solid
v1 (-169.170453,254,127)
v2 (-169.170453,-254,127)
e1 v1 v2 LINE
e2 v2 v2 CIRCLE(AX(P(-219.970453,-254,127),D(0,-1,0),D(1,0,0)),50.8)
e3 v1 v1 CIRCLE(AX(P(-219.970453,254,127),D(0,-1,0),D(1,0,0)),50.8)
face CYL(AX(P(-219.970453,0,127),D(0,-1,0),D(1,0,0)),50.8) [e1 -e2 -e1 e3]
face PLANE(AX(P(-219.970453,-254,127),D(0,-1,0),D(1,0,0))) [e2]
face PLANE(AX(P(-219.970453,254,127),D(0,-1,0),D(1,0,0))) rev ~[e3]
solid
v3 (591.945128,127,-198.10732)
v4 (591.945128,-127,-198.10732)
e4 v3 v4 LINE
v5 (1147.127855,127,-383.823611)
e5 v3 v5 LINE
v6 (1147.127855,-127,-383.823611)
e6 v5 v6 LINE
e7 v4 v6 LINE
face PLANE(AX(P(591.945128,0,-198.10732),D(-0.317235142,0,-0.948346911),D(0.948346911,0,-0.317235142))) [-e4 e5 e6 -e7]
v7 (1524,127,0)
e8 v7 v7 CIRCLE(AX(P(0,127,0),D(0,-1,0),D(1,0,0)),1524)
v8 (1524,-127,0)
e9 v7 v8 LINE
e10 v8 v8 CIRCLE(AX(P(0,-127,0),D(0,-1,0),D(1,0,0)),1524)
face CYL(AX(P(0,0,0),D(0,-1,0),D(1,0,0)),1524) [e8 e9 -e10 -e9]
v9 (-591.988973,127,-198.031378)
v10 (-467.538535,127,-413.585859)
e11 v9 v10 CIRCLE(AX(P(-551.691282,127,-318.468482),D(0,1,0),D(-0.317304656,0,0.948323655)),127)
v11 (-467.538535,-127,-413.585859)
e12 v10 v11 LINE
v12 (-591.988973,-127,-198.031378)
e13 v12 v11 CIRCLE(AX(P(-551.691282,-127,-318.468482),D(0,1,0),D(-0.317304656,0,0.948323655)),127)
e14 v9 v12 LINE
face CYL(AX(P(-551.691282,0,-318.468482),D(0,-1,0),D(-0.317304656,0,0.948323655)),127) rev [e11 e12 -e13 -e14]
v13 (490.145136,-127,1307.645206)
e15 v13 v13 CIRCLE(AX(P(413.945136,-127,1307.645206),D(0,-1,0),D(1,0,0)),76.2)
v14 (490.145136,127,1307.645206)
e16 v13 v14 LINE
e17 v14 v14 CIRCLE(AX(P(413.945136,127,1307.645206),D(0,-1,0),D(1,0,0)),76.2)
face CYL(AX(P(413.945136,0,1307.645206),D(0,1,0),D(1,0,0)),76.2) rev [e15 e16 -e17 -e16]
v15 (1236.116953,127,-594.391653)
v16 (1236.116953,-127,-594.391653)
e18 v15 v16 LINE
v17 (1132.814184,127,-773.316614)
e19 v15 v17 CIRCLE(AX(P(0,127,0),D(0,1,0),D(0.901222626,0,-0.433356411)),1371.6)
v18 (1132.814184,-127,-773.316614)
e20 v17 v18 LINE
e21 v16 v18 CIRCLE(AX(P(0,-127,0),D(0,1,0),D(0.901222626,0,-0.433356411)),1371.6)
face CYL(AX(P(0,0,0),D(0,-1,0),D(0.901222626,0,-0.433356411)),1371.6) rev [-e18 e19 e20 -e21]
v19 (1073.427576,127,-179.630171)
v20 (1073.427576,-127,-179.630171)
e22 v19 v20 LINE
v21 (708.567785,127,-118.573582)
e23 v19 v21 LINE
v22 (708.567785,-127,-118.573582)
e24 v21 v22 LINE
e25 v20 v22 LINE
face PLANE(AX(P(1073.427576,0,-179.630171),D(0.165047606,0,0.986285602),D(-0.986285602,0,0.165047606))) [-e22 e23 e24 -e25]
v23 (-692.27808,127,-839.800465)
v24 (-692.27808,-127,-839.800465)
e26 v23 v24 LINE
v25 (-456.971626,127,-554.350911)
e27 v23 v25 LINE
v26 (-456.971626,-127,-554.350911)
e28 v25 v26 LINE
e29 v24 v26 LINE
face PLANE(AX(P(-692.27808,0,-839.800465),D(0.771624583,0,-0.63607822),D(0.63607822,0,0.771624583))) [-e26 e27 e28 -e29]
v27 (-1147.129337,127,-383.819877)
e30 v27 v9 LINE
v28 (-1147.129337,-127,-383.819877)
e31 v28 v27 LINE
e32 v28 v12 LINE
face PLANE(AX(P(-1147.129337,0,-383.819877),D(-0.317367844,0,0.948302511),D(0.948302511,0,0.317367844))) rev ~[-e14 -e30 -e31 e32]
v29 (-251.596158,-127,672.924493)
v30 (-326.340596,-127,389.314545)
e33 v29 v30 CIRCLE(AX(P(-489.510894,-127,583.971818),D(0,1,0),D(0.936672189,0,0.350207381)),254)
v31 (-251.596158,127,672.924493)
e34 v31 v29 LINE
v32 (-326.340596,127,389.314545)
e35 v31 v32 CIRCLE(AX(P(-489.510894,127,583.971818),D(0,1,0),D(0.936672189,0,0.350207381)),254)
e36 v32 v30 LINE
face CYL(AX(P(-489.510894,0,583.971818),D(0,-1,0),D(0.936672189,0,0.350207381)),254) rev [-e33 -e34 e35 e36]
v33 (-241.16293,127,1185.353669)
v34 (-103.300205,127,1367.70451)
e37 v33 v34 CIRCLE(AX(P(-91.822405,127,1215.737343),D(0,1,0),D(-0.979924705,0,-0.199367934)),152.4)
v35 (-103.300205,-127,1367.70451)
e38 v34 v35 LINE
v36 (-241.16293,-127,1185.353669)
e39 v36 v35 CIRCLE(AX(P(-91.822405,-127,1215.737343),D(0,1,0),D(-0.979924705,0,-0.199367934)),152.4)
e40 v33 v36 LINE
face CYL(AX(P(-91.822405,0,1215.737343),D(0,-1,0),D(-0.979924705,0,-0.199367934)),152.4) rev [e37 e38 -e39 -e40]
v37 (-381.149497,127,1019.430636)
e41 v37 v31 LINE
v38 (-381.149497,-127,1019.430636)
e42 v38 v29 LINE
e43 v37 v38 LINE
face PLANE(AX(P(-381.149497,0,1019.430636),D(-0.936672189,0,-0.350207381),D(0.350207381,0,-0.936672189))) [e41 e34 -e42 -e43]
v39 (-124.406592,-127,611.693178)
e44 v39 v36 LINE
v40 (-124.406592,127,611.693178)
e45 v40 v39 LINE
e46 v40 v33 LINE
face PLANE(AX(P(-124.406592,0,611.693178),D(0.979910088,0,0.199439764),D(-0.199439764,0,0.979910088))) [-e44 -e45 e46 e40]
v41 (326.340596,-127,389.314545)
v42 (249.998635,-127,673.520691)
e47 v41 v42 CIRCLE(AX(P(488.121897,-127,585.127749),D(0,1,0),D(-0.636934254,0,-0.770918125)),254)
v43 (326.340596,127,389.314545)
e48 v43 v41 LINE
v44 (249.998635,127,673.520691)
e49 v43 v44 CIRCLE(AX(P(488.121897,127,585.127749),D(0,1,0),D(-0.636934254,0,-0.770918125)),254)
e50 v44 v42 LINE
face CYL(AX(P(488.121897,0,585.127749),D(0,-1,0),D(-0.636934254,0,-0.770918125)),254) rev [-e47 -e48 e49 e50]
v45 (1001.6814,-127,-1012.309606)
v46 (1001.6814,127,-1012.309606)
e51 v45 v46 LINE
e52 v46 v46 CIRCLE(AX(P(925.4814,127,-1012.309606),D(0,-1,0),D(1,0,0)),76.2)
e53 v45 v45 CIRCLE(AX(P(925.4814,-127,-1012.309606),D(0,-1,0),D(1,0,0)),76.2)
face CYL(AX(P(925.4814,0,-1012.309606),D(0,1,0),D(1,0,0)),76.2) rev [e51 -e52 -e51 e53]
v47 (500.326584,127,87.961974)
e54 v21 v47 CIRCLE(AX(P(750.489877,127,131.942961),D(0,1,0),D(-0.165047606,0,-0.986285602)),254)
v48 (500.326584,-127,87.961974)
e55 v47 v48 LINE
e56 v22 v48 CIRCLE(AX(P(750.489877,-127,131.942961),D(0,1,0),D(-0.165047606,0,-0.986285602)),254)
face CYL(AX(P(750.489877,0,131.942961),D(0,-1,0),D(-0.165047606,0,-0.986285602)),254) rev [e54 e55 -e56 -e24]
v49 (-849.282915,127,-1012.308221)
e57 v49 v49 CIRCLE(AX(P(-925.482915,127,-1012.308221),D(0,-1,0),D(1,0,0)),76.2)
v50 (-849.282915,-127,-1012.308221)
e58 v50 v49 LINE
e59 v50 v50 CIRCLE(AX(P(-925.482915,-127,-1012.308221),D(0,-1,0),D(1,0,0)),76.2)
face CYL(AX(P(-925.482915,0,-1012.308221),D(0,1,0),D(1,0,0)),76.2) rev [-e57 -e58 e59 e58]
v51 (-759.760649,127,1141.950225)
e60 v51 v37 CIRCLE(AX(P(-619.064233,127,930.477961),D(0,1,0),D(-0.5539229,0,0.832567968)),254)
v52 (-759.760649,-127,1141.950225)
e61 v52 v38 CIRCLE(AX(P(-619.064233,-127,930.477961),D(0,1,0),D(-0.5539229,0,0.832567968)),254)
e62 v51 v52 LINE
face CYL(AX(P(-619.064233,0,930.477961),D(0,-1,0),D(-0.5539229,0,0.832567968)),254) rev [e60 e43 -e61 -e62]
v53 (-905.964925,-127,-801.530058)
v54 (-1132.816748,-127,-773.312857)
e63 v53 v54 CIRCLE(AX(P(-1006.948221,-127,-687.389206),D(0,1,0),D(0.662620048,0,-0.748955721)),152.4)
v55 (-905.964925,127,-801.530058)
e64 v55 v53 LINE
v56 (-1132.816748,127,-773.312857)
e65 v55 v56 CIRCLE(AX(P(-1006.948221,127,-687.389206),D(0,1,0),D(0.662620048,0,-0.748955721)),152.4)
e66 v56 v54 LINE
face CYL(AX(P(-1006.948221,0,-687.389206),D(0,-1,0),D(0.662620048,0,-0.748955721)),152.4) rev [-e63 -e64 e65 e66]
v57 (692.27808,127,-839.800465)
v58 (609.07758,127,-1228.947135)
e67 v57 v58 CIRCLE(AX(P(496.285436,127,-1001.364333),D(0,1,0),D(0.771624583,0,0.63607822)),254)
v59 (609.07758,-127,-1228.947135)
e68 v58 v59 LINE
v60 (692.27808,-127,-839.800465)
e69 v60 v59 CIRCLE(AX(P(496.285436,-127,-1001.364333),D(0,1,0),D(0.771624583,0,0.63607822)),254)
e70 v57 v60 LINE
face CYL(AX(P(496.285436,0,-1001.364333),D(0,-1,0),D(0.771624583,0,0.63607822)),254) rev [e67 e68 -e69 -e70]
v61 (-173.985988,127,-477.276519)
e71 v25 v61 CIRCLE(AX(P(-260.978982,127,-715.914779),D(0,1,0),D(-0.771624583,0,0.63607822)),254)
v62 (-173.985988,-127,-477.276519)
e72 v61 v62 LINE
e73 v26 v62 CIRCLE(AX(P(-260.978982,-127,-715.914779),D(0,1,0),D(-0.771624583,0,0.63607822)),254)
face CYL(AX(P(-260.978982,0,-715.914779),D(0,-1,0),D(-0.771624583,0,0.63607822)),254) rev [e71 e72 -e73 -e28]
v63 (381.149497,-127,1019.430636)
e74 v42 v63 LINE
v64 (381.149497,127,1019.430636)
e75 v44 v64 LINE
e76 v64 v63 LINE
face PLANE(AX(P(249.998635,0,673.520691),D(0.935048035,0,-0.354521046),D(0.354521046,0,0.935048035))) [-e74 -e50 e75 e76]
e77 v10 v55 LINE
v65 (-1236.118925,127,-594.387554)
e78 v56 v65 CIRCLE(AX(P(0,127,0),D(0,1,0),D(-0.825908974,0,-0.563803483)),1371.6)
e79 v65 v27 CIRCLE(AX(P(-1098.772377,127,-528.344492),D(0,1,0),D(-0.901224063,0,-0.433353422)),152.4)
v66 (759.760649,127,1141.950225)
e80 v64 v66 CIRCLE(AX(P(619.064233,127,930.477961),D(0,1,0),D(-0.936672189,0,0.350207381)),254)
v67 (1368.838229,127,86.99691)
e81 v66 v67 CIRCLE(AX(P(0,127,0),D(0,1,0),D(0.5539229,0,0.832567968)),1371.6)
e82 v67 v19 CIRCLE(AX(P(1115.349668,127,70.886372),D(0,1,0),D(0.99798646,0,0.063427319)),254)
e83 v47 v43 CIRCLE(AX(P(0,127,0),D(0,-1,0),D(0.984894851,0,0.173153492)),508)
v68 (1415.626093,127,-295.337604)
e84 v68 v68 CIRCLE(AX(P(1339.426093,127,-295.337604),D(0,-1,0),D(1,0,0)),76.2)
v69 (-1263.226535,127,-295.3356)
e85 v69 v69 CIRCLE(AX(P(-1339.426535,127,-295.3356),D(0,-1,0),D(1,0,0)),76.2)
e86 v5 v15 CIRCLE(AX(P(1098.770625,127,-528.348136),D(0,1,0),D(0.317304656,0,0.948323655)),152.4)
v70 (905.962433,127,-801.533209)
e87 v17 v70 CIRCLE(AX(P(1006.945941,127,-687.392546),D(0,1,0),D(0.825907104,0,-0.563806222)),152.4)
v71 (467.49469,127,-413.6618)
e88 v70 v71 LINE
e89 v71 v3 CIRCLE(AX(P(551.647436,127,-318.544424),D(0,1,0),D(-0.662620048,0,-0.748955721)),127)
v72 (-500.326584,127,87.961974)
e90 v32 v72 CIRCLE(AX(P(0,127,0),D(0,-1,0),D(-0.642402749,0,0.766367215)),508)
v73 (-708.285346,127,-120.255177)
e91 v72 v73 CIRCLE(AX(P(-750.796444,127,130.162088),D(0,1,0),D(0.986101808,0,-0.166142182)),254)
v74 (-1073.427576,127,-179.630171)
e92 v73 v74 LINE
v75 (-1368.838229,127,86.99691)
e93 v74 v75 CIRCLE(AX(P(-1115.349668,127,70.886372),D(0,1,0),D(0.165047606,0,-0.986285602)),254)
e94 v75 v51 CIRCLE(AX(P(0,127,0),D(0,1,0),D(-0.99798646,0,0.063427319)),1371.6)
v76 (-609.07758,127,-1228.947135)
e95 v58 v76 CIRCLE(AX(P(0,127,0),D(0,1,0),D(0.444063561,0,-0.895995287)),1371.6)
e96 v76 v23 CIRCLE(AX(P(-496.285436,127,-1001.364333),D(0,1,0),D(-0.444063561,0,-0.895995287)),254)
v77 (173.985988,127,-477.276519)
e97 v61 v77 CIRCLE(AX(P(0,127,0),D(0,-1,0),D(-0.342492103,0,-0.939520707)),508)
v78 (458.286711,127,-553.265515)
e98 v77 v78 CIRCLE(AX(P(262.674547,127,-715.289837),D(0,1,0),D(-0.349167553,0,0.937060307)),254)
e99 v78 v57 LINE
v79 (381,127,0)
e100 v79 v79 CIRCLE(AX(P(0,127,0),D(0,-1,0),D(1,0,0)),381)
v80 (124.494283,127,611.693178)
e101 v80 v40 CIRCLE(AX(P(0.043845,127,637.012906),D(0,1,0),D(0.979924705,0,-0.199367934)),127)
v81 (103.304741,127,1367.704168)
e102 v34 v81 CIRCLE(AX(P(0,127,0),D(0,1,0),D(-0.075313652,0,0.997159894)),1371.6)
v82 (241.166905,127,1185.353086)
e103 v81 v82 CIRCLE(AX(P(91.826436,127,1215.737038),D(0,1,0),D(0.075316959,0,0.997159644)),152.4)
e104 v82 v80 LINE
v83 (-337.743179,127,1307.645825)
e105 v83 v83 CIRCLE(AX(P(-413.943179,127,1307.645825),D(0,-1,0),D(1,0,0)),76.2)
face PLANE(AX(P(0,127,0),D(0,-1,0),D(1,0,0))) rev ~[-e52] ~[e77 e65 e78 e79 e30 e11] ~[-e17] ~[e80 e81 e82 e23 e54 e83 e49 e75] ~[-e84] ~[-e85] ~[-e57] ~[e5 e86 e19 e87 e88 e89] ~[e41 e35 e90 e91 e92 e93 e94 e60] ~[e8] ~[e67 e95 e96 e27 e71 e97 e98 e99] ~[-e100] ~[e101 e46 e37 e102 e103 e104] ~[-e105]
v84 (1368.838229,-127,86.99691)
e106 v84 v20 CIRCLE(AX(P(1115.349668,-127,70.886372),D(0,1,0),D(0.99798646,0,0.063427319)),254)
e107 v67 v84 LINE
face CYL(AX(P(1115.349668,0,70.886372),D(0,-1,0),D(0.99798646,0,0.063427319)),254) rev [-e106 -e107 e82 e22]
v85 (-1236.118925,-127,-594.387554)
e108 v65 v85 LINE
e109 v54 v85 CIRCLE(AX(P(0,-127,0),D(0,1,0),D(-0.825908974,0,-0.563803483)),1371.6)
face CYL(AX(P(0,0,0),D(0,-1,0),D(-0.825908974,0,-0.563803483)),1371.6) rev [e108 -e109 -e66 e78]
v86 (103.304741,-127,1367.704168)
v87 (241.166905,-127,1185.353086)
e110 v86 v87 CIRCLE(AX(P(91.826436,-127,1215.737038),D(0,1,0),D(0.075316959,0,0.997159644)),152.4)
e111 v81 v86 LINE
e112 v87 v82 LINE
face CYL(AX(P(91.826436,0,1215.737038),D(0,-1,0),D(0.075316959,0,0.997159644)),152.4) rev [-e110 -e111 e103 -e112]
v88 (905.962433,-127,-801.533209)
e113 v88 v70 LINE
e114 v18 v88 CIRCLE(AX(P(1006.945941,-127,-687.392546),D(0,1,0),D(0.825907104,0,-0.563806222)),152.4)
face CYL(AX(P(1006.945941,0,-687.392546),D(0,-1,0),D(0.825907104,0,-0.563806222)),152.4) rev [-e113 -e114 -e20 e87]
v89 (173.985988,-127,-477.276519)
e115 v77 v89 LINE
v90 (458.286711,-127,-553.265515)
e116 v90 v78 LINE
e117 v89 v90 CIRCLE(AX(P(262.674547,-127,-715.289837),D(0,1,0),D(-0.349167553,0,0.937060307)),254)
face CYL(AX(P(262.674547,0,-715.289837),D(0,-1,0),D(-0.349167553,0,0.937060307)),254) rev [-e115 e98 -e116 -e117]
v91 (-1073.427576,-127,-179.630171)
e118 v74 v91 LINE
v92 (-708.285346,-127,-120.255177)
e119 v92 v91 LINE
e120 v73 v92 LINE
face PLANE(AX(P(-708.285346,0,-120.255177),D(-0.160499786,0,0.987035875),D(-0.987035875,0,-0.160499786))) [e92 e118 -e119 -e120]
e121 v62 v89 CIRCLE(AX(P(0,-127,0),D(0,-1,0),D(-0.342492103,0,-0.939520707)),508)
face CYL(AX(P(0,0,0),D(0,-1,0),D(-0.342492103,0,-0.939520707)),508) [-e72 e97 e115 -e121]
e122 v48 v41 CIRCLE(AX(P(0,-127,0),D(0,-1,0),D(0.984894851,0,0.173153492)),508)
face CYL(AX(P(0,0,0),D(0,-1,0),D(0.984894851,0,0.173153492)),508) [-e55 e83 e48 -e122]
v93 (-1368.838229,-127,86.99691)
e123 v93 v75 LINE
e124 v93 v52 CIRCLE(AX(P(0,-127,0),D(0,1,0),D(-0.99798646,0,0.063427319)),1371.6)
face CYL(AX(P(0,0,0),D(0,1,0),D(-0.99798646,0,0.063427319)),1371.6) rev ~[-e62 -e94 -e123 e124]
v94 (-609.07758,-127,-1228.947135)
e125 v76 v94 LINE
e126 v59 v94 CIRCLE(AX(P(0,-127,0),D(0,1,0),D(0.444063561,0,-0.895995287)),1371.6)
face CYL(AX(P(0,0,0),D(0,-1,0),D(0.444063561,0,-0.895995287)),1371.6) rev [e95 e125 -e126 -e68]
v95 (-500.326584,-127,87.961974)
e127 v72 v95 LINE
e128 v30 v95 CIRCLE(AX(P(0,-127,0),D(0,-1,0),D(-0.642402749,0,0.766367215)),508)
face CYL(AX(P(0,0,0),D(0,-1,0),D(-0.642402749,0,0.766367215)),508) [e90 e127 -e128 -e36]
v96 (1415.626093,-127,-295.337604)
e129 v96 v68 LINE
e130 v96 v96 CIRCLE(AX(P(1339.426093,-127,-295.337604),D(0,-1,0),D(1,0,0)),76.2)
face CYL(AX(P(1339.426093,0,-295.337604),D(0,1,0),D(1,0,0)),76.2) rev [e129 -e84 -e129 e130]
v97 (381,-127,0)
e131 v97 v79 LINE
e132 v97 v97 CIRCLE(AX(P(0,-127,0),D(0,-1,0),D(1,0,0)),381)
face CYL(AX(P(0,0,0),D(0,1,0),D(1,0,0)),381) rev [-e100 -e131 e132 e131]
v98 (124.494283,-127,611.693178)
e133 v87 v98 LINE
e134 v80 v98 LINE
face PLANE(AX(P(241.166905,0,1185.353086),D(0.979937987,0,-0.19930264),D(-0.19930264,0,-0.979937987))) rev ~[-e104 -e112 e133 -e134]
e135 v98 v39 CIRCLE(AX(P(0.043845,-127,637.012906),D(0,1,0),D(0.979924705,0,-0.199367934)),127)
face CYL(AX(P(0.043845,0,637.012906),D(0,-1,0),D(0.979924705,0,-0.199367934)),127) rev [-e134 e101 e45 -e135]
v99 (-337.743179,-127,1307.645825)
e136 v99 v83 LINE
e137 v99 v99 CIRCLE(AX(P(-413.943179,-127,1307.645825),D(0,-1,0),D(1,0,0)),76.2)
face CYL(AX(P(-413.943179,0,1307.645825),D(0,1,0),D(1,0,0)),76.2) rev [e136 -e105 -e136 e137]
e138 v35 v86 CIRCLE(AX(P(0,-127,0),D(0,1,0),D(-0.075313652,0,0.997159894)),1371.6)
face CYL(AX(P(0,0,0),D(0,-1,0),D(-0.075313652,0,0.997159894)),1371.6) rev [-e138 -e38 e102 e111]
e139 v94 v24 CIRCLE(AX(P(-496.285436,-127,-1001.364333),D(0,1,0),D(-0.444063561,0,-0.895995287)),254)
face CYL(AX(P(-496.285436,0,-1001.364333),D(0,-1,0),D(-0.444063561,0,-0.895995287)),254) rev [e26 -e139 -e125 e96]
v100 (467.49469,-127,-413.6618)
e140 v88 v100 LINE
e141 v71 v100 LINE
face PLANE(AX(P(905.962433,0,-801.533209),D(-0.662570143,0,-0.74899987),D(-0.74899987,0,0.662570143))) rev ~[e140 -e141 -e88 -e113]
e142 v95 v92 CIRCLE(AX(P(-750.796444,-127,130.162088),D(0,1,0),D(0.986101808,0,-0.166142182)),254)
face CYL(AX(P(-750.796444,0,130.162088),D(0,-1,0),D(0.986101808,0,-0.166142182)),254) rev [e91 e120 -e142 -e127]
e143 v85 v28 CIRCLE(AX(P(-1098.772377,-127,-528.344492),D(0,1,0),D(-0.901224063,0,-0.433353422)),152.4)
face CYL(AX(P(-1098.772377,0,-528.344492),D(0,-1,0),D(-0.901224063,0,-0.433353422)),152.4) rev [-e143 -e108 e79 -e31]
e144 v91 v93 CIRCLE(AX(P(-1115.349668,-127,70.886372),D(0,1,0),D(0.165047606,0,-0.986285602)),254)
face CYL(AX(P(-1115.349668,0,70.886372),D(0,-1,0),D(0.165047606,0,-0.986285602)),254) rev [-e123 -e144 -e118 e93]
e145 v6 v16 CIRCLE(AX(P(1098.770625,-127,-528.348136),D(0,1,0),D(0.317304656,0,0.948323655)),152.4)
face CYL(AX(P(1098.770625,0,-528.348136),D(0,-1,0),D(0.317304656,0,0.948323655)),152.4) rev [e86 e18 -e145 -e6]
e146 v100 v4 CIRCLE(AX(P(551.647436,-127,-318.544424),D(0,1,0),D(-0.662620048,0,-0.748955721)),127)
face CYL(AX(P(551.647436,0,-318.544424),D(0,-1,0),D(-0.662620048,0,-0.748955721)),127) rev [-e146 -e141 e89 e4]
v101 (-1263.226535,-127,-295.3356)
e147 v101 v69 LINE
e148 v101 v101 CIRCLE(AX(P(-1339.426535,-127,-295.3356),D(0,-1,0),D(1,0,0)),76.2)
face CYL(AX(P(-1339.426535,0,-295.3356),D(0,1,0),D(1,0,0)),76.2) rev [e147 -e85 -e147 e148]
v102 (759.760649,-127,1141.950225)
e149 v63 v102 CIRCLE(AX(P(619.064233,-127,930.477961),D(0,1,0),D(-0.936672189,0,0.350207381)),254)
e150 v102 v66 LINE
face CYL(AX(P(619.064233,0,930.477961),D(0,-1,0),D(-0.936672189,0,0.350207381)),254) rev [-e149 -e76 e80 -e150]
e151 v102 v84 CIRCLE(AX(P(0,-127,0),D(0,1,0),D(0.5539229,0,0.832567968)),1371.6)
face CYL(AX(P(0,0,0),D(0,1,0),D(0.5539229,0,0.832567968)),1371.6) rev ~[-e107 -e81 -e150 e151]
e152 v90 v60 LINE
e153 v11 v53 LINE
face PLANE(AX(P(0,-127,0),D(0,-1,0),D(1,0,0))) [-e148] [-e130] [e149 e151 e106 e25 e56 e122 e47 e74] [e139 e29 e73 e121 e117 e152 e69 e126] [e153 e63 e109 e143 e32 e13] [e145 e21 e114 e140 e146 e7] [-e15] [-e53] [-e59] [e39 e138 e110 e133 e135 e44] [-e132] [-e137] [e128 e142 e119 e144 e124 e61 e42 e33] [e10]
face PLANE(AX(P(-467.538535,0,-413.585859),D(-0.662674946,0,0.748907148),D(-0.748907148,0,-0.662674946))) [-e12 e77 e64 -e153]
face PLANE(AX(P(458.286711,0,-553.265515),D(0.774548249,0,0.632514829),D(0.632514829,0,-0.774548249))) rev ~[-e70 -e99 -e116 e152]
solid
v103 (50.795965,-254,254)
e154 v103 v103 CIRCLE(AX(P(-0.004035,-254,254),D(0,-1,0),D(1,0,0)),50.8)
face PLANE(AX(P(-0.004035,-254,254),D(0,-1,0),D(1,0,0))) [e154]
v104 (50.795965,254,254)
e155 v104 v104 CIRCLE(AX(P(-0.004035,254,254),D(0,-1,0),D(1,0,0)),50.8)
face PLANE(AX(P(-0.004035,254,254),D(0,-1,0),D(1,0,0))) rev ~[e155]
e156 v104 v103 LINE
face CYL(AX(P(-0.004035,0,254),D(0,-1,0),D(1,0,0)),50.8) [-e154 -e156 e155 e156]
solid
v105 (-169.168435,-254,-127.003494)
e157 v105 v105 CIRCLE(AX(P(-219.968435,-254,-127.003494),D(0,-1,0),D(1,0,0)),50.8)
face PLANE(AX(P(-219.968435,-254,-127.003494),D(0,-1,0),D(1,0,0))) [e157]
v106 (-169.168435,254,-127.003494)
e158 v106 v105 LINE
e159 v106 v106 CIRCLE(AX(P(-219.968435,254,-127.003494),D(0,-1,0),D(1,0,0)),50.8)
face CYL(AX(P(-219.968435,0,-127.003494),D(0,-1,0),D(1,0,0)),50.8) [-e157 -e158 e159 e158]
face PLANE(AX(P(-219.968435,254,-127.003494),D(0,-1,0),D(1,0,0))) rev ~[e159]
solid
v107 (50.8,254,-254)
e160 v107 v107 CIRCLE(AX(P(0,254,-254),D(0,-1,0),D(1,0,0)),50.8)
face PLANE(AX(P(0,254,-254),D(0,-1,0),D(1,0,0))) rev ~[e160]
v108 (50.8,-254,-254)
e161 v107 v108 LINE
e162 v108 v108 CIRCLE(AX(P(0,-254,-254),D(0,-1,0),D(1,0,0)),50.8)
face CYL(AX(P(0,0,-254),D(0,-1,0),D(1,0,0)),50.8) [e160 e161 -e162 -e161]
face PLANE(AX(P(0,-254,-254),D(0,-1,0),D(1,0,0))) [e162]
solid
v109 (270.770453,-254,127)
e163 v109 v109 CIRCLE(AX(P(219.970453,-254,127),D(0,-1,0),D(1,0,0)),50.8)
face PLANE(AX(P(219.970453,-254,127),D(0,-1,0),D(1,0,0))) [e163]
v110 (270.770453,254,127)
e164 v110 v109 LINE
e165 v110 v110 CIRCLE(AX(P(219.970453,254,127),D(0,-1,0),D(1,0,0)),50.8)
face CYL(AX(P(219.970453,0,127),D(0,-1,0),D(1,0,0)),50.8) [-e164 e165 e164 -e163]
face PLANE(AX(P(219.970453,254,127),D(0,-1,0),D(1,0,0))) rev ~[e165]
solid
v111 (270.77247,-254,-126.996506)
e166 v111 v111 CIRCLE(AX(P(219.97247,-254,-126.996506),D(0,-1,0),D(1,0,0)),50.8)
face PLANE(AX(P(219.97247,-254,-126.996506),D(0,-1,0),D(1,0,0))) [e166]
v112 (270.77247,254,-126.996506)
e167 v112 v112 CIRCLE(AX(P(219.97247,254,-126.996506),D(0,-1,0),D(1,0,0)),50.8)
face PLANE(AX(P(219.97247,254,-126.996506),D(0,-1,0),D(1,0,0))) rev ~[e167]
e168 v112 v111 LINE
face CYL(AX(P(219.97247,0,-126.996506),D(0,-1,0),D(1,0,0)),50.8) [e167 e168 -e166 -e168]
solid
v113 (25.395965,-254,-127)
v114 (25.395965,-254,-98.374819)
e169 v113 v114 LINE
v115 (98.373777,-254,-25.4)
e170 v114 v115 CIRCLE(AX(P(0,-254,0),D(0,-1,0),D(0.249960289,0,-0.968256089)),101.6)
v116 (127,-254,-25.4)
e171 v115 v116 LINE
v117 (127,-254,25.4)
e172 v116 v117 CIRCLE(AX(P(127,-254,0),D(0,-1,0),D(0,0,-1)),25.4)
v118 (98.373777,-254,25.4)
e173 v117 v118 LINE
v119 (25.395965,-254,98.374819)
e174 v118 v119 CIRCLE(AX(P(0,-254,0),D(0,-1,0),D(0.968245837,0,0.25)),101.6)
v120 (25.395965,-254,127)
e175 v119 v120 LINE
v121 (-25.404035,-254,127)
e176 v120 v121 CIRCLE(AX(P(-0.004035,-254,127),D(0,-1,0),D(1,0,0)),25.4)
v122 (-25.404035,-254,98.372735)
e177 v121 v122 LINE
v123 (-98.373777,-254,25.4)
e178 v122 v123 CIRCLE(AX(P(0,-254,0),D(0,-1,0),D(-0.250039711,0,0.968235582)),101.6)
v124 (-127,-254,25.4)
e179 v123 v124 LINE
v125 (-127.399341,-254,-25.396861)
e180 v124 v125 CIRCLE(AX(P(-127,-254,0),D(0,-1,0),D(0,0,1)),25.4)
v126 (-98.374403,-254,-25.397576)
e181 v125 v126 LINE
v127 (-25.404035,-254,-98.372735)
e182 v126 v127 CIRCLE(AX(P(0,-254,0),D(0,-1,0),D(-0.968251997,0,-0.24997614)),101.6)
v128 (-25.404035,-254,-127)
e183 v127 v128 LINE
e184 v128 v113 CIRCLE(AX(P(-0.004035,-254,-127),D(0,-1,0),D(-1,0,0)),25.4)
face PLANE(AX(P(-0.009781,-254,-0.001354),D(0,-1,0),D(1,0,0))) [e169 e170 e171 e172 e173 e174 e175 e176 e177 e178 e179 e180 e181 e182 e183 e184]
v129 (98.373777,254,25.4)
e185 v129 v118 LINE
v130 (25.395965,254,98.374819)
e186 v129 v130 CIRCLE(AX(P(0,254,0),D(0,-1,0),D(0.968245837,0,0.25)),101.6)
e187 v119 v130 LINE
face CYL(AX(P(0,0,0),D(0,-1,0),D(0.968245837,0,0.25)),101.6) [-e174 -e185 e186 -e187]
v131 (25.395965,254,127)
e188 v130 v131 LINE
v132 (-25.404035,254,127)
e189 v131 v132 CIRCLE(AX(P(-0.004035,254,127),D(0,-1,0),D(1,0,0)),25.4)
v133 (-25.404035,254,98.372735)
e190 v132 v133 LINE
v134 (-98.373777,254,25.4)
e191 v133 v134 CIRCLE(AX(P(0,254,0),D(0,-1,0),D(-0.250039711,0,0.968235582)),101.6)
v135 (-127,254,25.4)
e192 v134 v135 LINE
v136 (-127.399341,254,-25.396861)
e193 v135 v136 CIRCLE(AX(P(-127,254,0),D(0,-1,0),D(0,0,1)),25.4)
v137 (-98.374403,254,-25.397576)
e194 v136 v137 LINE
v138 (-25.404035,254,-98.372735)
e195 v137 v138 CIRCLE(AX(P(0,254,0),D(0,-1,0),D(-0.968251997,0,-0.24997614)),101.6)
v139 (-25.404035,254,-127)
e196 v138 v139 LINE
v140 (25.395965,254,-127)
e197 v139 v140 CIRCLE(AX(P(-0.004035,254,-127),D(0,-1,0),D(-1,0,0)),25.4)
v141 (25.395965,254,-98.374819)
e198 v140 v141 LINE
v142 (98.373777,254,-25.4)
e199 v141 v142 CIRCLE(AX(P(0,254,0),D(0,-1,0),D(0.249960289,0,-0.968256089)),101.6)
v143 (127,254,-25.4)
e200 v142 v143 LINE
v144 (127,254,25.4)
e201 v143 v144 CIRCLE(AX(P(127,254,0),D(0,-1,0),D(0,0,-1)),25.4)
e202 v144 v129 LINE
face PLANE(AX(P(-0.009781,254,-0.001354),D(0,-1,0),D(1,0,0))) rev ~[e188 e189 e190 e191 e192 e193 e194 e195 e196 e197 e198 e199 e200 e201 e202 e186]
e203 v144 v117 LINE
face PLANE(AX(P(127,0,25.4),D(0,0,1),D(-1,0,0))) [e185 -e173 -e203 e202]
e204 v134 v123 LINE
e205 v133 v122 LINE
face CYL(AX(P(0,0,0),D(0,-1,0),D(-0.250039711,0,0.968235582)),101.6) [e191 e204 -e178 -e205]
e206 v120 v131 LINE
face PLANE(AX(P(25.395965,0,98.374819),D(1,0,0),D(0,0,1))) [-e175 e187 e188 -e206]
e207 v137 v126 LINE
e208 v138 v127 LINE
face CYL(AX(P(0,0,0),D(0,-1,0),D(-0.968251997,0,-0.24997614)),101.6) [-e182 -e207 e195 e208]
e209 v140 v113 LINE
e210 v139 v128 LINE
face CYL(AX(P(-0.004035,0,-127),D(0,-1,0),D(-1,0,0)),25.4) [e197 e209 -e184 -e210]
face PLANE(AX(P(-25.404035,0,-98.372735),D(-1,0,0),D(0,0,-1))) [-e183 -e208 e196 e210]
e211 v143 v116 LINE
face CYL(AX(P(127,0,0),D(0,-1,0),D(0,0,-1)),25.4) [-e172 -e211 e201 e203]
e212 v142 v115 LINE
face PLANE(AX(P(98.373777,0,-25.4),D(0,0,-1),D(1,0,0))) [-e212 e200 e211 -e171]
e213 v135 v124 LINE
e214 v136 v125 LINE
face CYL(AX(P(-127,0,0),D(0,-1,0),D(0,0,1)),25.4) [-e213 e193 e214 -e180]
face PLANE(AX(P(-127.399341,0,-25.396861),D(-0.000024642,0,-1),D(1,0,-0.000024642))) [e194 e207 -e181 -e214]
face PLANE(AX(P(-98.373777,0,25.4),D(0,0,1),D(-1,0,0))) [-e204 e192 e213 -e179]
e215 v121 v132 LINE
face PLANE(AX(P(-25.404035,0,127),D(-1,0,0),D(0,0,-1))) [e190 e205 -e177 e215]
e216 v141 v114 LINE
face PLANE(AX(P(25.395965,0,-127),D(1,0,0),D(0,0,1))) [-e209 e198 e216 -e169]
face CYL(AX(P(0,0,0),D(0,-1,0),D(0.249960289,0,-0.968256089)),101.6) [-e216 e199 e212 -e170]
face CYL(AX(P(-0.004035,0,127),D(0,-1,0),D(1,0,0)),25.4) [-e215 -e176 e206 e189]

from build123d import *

# Parameters (mm, degrees)
F0_R     = 1524
F0_R_2   = 76.2
F0_R_3   = 381
F1_DEPTH = 127
F2_DEPTH = 254
F0_R_4   = 50.8


with BuildPart() as f1:
    # F0 (on Front) → F1 (new body, symmetric)
    with BuildSketch(Plane.XZ):
        Circle(F0_R)
        with Locations((-925.4829146604, -1012.3082211815)):
            Circle(F0_R_2, mode=Mode.SUBTRACT)
        with BuildLine():
            ThreePointArc((-1132.816748196, -773.3128571327), (-1187.8415809568, -685.798030436), (-1236.1189245676, -594.3875539796))
            ThreePointArc((-1236.1189245676, -594.3875539796), (-1239.1509183738, -469.0180629686), (-1147.1293372664, -383.8198771117))
            Line((-1147.1293372664, -383.8198771117), (-591.9889729048, -198.0313777959))
            ThreePointArc((-591.9889729048, -198.0313777959), (-441.7060552607, -254.9684820071), (-467.5385354179, -413.5858585473))
            Line((-467.5385354179, -413.5858585473), (-905.9649252706, -801.5300581884))
            ThreePointArc((-905.9649252706, -801.5300581884), (-1025.7596879891, -838.6237549571), (-1132.816748196, -773.3128571327))
        make_face(mode=Mode.SUBTRACT)
        with Locations((-1339.4265353536, -295.3355995993)):
            Circle(F0_R_2, mode=Mode.SUBTRACT)
        with BuildLine():
            ThreePointArc((-456.9716264903, -554.3509110508), (-327.7273635176, -470.8420273415), (-173.9859882065, -477.2765193342))
            ThreePointArc((-173.9859882065, -477.2765193342), (0, -508), (173.9859882065, -477.2765193342))
            ThreePointArc((173.9859882065, -477.2765193342), (328.2622454607, -469.9039091571), (458.2867111018, -553.2655146354))
            Line((458.2867111018, -553.2655146354), (692.2780797644, -839.8004645615))
            ThreePointArc((692.2780797644, -839.8004645615), (744.6718165916, -1054.4699417253), (609.0775800349, -1228.9471353557))
            ThreePointArc((609.0775800349, -1228.9471353557), (0, -1371.6), (-609.0775800349, -1228.9471353557))
            ThreePointArc((-609.0775800349, -1228.9471353557), (-744.6718165916, -1054.4699417253), (-692.2780797644, -839.8004645615))
            Line((-692.2780797644, -839.8004645615), (-456.9716264903, -554.3509110508))
        make_face(mode=Mode.SUBTRACT)
        with Locations((925.4813995717, -1012.3096063195)):
            Circle(F0_R_2, mode=Mode.SUBTRACT)
        with BuildLine():
            ThreePointArc((1236.116953448, -594.3916532039), (1187.8393067014, -685.8019695621), (1132.8141837234, -773.3166137844))
            ThreePointArc((1132.8141837234, -773.3166137844), (1025.7570165515, -838.6271429503), (905.9624326894, -801.5332089433))
            Line((905.9624326894, -801.5332089433), (467.49469037, -413.6618003978))
            ThreePointArc((467.49469037, -413.6618003978), (441.6622102128, -255.0444238576), (591.9451278569, -198.1073196465))
            Line((591.9451278569, -198.1073196465), (1147.1278549233, -383.8236111278))
            ThreePointArc((1147.1278549233, -383.8236111278), (1239.1493200045, -469.022070498), (1236.116953448, -594.3916532039))
        make_face(mode=Mode.SUBTRACT)
        with Locations((1339.4260933332, -295.3376042736)):
            Circle(F0_R_2, mode=Mode.SUBTRACT)
        with BuildLine():
            ThreePointArc((-500.3265844765, 87.9619739777), (-571.079845398, -49.3314890937), (-708.285346263, -120.2551767133))
            Line((-708.285346263, -120.2551767133), (-1073.4275763024, -179.6301712784))
            ThreePointArc((-1073.4275763024, -179.6301712784), (-1285.533665357, -117.669739788), (-1368.8382291435, 86.9969104921))
            ThreePointArc((-1368.8382291435, 86.9969104921), (-1187.8404438307, 685.8), (-759.7606491087, 1141.9502248636))
            ThreePointArc((-759.7606491087, 1141.9502248636), (-540.8618487654, 1172.1396815133), (-381.149496538, 1019.4306358399))
            Line((-381.149496538, 1019.4306358399), (-251.5961583359, 672.9244928747))
            ThreePointArc((-251.5961583359, 672.9244928747), (-243.8974750883, 519.2412359922), (-326.34059627, 389.3145453565))
            ThreePointArc((-326.34059627, 389.3145453565), (-439.9409051225, 254), (-500.3265844765, 87.9619739777))
        make_face(mode=Mode.SUBTRACT)
        with Locations((-413.9431786728, 1307.6458254551)):
            Circle(F0_R_2, mode=Mode.SUBTRACT)
        Circle(F0_R_3, mode=Mode.SUBTRACT)
        with BuildLine():
            ThreePointArc((326.34059627, 389.3145453565), (242.8175999373, 519.2353982508), (249.9986351612, 673.5206913487))
            Line((249.9986351612, 673.5206913487), (381.149496538, 1019.4306358399))
            ThreePointArc((381.149496538, 1019.4306358399), (540.8618487654, 1172.1396815133), (759.7606491087, 1141.9502248636))
            ThreePointArc((759.7606491087, 1141.9502248636), (1187.8404438307, 685.8), (1368.8382291435, 86.9969104921))
            ThreePointArc((1368.8382291435, 86.9969104921), (1285.533665357, -117.669739788), (1073.4275763024, -179.6301712784))
            Line((1073.4275763024, -179.6301712784), (708.5677848262, -118.5735818239))
            ThreePointArc((708.5677848262, -118.5735818239), (571.6248386059, -48.3992086508), (500.3265844765, 87.9619739777))
            ThreePointArc((500.3265844765, 87.9619739777), (439.9409051225, 254), (326.34059627, 389.3145453565))
        make_face(mode=Mode.SUBTRACT)
        with BuildLine():
            ThreePointArc((-103.300205252, 1367.7045103365), (0.0022742555, 1371.5999999981), (103.3047408442, 1367.704167764))
            ThreePointArc((103.3047408442, 1367.704167764), (213.3939018224, 1307.6452059188), (241.1669045771, 1185.353086055))
            Line((241.1669045771, 1185.353086055), (124.4942825347, 611.6931781937))
            ThreePointArc((124.4942825347, 611.6931781937), (0.0438450479, 510.0129058647), (-124.406592439, 611.6931781937))
            Line((-124.406592439, 611.6931781937), (-241.1629296527, 1185.3536693162))
            ThreePointArc((-241.1629296527, 1185.3536693162), (-213.3896320154, 1307.6458254551), (-103.300205252, 1367.7045103365))
        make_face(mode=Mode.SUBTRACT)
        with Locations((413.9451357819, 1307.6452059188)):
            Circle(F0_R_2, mode=Mode.SUBTRACT)
    extrude(amount=F1_DEPTH, both=True)


with BuildPart() as f2:
    # F0 (on Front) → F2 (new body, symmetric)
    with BuildSketch(Plane.XZ):
        with BuildLine():
            Line((-25.4040345891, 126.9999999359), (-25.4040345891, 98.372735179))
            ThreePointArc((-25.4040345891, 98.372735179), (-71.8435221849, 71.840575722), (-98.3737769937, 25.4))
            Line((-98.3737769937, 25.4), (-127, 25.4))
            ThreePointArc((-127, 25.4), (-152.3992151293, 0.199676781), (-127.3993412219, -25.3968605656))
            Line((-127.3993412219, -25.3968605656), (-98.3744028845, -25.3975758118))
            ThreePointArc((-98.3744028845, -25.3975758118), (-71.8444073469, -71.8396905128), (-25.4040345891, -98.372735179))
            Line((-25.4040345891, -98.372735179), (-25.4040345891, -126.9999999359))
            ThreePointArc((-25.4040345891, -126.9999999359), (-0.0040345891, -152.3999999359), (25.3959654109, -126.9999999359))
            Line((25.3959654109, -126.9999999359), (25.3959654109, -98.3748186318))
            ThreePointArc((25.3959654109, -98.3748186318), (71.8405757376, -71.8435221693), (98.3737769937, -25.4))
            Line((98.3737769937, -25.4), (127, -25.4))
            ThreePointArc((127, -25.4), (152.4, 0), (127, 25.4))
            Line((127, 25.4), (98.3737769937, 25.4))
            ThreePointArc((98.3737769937, 25.4), (71.8405757376, 71.8435221693), (25.3959654109, 98.3748186318))
            Line((25.3959654109, 98.3748186318), (25.3959654109, 126.9999999359))
            ThreePointArc((25.3959654109, 126.9999999359), (-0.0040345891, 152.3999999359), (-25.4040345891, 126.9999999359))
        make_face()
    extrude(amount=F2_DEPTH, both=True)


with BuildPart() as f2b:
    # F0 (on Front) → F2, piece 2 (new body, symmetric)
    with BuildSketch(Plane.XZ):
        with Locations((-0.0040345891, 253.999999968)):
            Circle(F0_R_4)
    extrude(amount=F2_DEPTH, both=True)


with BuildPart() as f2c:
    # F0 (on Front) → F2, piece 3 (new body, symmetric)
    with BuildSketch(Plane.XZ):
        with Locations((-219.9704525612, 127)):
            Circle(F0_R_4)
    extrude(amount=F2_DEPTH, both=True)


with BuildPart() as f2d:
    # F0 (on Front) → F2, piece 4 (new body, symmetric)
    with BuildSketch(Plane.XZ):
        with Locations((-219.968435239, -127.0034940406)):
            Circle(F0_R_4)
    extrude(amount=F2_DEPTH, both=True)


with BuildPart() as f2e:
    # F0 (on Front) → F2, piece 5 (new body, symmetric)
    with BuildSketch(Plane.XZ):
        with Locations((0, -254)):
            Circle(F0_R_4)
    extrude(amount=F2_DEPTH, both=True)


with BuildPart() as f2f:
    # F0 (on Front) → F2, piece 6 (new body, symmetric)
    with BuildSketch(Plane.XZ):
        with Locations((219.972469828, -126.9965059273)):
            Circle(F0_R_4)
    extrude(amount=F2_DEPTH, both=True)


with BuildPart() as f2g:
    # F0 (on Front) → F2, piece 7 (new body, symmetric)
    with BuildSketch(Plane.XZ):
        with Locations((219.9704525612, 127)):
            Circle(F0_R_4)
    extrude(amount=F2_DEPTH, both=True)


solid = Compound([f1.part, f2.part, f2b.part, f2c.part, f2d.part, f2e.part, f2f.part, f2g.part])
